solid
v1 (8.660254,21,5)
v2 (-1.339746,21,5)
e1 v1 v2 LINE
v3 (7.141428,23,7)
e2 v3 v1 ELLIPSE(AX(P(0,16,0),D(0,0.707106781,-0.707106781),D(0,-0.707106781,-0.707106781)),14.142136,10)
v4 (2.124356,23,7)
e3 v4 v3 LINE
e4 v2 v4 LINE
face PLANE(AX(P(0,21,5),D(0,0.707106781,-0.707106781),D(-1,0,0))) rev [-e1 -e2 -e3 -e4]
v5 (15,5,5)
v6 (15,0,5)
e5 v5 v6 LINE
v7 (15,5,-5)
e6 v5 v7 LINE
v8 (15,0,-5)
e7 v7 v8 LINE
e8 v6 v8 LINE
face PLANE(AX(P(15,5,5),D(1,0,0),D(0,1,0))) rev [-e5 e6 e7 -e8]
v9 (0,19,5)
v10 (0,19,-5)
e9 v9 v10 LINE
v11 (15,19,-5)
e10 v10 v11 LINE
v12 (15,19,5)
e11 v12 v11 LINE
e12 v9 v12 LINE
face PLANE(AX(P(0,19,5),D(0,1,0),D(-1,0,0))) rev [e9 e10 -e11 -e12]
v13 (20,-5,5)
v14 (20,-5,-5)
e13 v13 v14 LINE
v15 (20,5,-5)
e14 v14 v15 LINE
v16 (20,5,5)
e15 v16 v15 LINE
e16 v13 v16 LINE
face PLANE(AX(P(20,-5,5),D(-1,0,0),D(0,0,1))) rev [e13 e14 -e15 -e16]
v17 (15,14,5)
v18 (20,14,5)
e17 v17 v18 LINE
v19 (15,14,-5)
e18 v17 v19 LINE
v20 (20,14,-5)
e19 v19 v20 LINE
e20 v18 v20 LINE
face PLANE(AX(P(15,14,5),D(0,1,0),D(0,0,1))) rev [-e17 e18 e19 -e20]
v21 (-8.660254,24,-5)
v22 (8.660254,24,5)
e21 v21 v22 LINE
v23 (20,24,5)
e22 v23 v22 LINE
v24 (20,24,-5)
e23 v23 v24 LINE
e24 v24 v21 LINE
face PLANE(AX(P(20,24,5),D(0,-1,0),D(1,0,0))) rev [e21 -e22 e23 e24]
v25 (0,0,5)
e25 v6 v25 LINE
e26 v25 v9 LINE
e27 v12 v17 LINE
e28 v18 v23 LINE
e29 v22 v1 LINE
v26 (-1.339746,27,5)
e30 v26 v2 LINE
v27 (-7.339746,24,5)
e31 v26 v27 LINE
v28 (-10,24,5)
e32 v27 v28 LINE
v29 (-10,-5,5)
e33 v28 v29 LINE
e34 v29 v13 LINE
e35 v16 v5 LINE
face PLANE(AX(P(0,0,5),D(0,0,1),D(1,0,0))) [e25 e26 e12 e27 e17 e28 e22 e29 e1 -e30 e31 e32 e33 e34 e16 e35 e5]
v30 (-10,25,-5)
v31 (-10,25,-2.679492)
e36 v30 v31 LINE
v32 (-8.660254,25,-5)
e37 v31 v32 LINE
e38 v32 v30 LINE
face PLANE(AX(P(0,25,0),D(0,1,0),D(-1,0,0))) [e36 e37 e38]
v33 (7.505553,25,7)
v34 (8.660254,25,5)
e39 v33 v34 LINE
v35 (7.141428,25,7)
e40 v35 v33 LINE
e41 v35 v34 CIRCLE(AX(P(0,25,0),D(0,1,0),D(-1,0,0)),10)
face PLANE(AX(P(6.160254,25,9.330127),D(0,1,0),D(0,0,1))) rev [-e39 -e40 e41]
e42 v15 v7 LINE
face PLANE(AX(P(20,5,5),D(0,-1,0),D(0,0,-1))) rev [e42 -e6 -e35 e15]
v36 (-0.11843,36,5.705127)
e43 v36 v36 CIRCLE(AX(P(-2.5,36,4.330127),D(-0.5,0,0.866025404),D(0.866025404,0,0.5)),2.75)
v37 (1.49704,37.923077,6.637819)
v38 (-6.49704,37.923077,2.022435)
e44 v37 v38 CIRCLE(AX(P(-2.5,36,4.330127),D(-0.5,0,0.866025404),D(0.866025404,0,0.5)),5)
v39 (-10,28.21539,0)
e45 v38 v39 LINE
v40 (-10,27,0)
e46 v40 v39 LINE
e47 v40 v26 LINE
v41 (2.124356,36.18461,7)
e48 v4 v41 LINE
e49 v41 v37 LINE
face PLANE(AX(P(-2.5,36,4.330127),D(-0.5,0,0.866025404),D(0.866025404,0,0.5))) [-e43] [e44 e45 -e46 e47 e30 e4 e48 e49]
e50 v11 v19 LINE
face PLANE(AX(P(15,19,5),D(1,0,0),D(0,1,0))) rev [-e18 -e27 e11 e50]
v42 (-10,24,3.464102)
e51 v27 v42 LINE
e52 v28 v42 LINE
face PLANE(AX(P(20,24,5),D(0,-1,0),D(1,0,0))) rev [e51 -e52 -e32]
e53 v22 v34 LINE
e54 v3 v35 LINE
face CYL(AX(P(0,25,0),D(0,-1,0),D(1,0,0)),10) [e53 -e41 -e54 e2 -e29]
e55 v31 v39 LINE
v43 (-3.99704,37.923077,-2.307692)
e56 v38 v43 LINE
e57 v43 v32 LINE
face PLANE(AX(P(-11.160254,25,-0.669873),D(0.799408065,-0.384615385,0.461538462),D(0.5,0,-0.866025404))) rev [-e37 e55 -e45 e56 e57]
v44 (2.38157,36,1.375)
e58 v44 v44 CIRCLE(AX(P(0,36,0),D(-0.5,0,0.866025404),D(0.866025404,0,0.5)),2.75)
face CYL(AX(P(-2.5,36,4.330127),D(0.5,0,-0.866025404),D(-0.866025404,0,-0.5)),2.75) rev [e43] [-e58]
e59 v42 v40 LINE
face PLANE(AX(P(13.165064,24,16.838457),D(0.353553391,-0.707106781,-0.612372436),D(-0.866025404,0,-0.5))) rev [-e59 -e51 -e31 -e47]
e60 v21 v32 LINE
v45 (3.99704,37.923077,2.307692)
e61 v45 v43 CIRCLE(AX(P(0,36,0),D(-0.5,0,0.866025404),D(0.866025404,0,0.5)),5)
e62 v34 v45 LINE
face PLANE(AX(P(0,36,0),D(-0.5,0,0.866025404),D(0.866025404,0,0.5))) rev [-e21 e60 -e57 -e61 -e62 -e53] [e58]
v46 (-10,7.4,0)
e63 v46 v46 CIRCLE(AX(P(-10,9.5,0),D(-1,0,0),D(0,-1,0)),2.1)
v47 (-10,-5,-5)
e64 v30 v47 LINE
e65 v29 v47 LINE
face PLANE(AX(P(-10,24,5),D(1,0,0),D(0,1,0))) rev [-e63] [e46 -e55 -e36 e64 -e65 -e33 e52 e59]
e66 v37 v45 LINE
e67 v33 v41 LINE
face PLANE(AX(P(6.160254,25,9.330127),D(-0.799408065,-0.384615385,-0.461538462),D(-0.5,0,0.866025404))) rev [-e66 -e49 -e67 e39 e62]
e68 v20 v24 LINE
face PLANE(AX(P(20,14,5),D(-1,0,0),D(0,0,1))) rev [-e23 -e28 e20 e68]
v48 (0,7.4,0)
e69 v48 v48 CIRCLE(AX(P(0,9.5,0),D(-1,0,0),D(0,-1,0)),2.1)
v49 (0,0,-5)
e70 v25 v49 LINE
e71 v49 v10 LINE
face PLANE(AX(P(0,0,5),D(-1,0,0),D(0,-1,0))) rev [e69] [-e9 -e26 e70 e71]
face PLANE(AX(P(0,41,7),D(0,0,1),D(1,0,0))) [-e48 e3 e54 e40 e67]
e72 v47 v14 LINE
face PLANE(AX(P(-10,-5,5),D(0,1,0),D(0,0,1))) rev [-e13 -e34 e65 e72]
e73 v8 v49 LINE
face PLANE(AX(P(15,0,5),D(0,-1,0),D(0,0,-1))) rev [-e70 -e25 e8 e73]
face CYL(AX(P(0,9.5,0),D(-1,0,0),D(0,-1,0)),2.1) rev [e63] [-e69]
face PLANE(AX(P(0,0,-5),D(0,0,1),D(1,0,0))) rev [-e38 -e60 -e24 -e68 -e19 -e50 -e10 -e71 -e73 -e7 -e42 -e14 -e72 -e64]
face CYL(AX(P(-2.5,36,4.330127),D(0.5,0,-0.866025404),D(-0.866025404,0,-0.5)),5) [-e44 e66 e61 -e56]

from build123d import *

# Parameters (mm, degrees)
BOSS_EXTRUDE1_DEPTH = 5
SKETCH2_R           = 2.1
CUT_EXTRUDE1_DEPTH  = 10
SKETCH3_R           = 10
BOSS_EXTRUDE2_DEPTH = 1
SKETCH4_R           = 2.75
BOSS_EXTRUDE3_DEPTH = 5
SKETCH5_W           = 50
SKETCH5_H           = 30
SKETCH5_W_2         = 34
SKETCH5_H_2         = 14
CUT_EXTRUDE2_DEPTH  = 52.14684741
CUT_EXTRUDE3_START  = -1
CUT_EXTRUDE3_DEPTH  = 1
CUT_EXTRUDE4_START  = -1
CUT_EXTRUDE4_DEPTH  = 1
CHAMFER1_SIZE       = 3
CHAMFER2_SIZE       = 3
SKETCH8_W           = 10.980685111
SKETCH8_H           = 18.946061275
CUT_EXTRUDE5_DEPTH  = 51.645829048
BOSS_EXTRUDE4_DEPTH = 1


with BuildPart() as part:
    # Sketch1 → Boss-Extrude1 (new, symmetric)
    with BuildSketch(Plane.XY):
        Polygon((15, 5), (15, 0), (0, 0), (0, 19), (15, 19), (15, 14), (20, 14), (20, 24), (-10, 24), (-10, -5), (20, -5), (20, 5), align=None)
    extrude(amount=BOSS_EXTRUDE1_DEPTH, both=True)

    # Sketch2 → Cut-Extrude1 (cut)
    with BuildSketch(Plane.ZY.offset(10)):
        with Locations(Location((0, 9.5, 0), (0, 0, 270))):
            Circle(SKETCH2_R)
    extrude(amount=-CUT_EXTRUDE1_DEPTH, mode=Mode.SUBTRACT)

    # Sketch3 → Boss-Extrude2 (add)
    with BuildSketch(Plane(origin=(0, 24, 0), x_dir=(1, 0, 0), z_dir=(0, 1, 0))):
        with Locations(Location((0, 0, 0), (0, 0, 180))):
            Circle(SKETCH3_R)
    extrude(amount=BOSS_EXTRUDE2_DEPTH)

    # Sketch4 → Boss-Extrude3 (add)
    with BuildSketch(Plane(origin=(0, 0, 0), x_dir=(0.866025403784438, 0, 0.500000000000001), z_dir=(-0.500000000000001, 0, 0.866025403784438))):
        with BuildLine():
            Line((10, 25), (-10, 25))
            Line((-10, 25), (-4.615384615, 37.923076923))
            ThreePointArc((-4.615384615, 37.923076923), (0, 41), (4.615384615, 37.923076923))
            Line((4.615384615, 37.923076923), (10, 25))
        make_face()
        with Locations((0, 36)):
            Circle(SKETCH4_R, mode=Mode.SUBTRACT)
    extrude(amount=BOSS_EXTRUDE3_DEPTH)

    # Sketch5 → Cut-Extrude2 (cut, through all)
    with BuildSketch(Plane.XZ.offset(5)):
        with Locations((5, 0)):
            Rectangle(SKETCH5_W, SKETCH5_H)
        with Locations((5, 0)):
            Rectangle(SKETCH5_W_2, SKETCH5_H_2, mode=Mode.SUBTRACT)
    extrude(amount=-CUT_EXTRUDE2_DEPTH, mode=Mode.SUBTRACT)

    # Sketch6 → Cut-Extrude3 (cut)
    with BuildSketch(Plane(origin=(0, 25, 0), x_dir=(1, 0, 0), z_dir=(0, 1, 0)).offset(CUT_EXTRUDE3_START)):
        with BuildLine():
            Line((7.141428429, 7), (-7.141428429, 7))
            ThreePointArc((-7.141428429, 7), (-7.963874195, 6.047868038), (-8.660254038, 5))
            Line((-8.660254038, 5), (8.660254038, -5))
            ThreePointArc((8.660254038, -5), (9.920851384, 1.255670262), (7.141428429, 7))
        make_face()
    extrude(amount=CUT_EXTRUDE3_DEPTH, mode=Mode.SUBTRACT)

    # Sketch7 → Cut-Extrude4 (cut)
    with BuildSketch(Plane(origin=(0, 25, 0), x_dir=(1, 0, 0), z_dir=(0, 1, 0)).offset(CUT_EXTRUDE4_START)):
        with BuildLine():
            Line((-7.141428429, -7), (2.124355653, -7))
            Line((2.124355653, -7), (-10, 0))
            ThreePointArc((-10, 0), (-9.257815193, -3.780589618), (-7.141428429, -7))
        make_face()
    extrude(amount=CUT_EXTRUDE4_DEPTH, mode=Mode.SUBTRACT)

    # Chamfer1
    # the kernel refuses this chamfer: 3 mm, written as the material it adds along each edge
    with BuildSketch(Plane(origin=(5.341682432, 24, 8.857524482), x_dir=(0.013747938305293134, 0.9996219169112968, -0.023812127644090214), z_dir=(-0.8660254037844382, 0, -0.500000000000001))) as chamfer1_piece_1_section:
        Polygon((CHAMFER1_SIZE * 0.999621916911, -CHAMFER1_SIZE * 0.0274958766106), (-CHAMFER1_SIZE * 0.0274958766106, -CHAMFER1_SIZE * 0.999621916911), (0, 0), align=None)
    chamfer1_piece_1 = extrude(amount=25.430097928, mode=Mode.PRIVATE)
    chamfer1_piece_1 = split(chamfer1_piece_1, bisect_by=Plane(origin=(-10, 25.699033003, 2.85935222), z_dir=(1, 0, 0)), keep=Keep.TOP, mode=Mode.PRIVATE)
    chamfer1_piece_1 = split(chamfer1_piece_1, bisect_by=Plane(origin=(-6.251324666, 25.699033003, 5), z_dir=(0, 0, -1)), keep=Keep.TOP, mode=Mode.PRIVATE)
    add(chamfer1_piece_1)
    with BuildSketch(Plane(origin=(5.341682432, 24, 8.857524482), x_dir=(0.013747938305293134, 0.9996219169112968, -0.023812127644090214), z_dir=(-0.8660254037844382, 0, -0.500000000000001))) as chamfer1_piece_2_section:
        Polygon((CHAMFER1_SIZE * 0.999621916911, -CHAMFER1_SIZE * 0.0274958766106), (-CHAMFER1_SIZE * 0.0274958766106, -CHAMFER1_SIZE * 0.999621916911), (0, 0), align=None)
    chamfer1_piece_2 = extrude(amount=25.430097928, mode=Mode.PRIVATE)
    chamfer1_piece_2 = split(chamfer1_piece_2, bisect_by=Plane(origin=(-10.676225886, 25, 0.518721071), z_dir=(0, 1, 0)), keep=Keep.TOP, mode=Mode.PRIVATE)
    chamfer1_piece_2 = split(chamfer1_piece_2, bisect_by=Plane(origin=(-11.252418357, 25.835555068, 0.186056192), z_dir=(0.7994080650317889, -0.38461538461538497, 0.46153846153846245)), keep=Keep.TOP, mode=Mode.PRIVATE)
    chamfer1_piece_2 = split(chamfer1_piece_2, bisect_by=Plane(origin=(-10.676225886, 25.558334336, 5), z_dir=(0, 0, -1)), keep=Keep.TOP, mode=Mode.PRIVATE)
    add(chamfer1_piece_2)

    # Chamfer2
    # the kernel refuses this chamfer: 3 mm, written as the material it adds along each edge
    with BuildSketch(Plane(origin=(16.375303002, 24, 5), x_dir=(0, -0.9996219169112968, -0.02749587661058648), z_dir=(-1, 0, 0))) as chamfer2_piece_1_section:
        Polygon((CHAMFER2_SIZE * 0.999621916911, CHAMFER2_SIZE * 0.0274958766106), (-CHAMFER2_SIZE * 0.0274958766106, CHAMFER2_SIZE * 0.999621916911), (0, 0), align=None)
    chamfer2_piece_1 = extrude(amount=25.430097928, mode=Mode.PRIVATE)
    chamfer2_piece_1 = chamfer2_piece_1 & Plane(origin=(0, 22.869371877, 0), x_dir=(-1, 0, 0), z_dir=(0, -1, 0)) * Cylinder(10, 63, mode=Mode.PRIVATE)
    chamfer2_piece_1 = split(chamfer2_piece_1, bisect_by=Plane(origin=(4.051544609, 22.869371877, 7), z_dir=(0, 0, -1)), keep=Keep.TOP, mode=Mode.PRIVATE)
    chamfer2_piece_1 = split(chamfer2_piece_1, bisect_by=Plane(origin=(3.023607395, 22.869371877, 7.519183235), z_dir=(0.500000000000001, 0, -0.8660254037844382)), keep=Keep.TOP, mode=Mode.PRIVATE)
    add(chamfer2_piece_1)

    # Sketch8 → Cut-Extrude5 (cut, through all)
    with BuildSketch(Plane.XZ.offset(5)):
        with Locations((-15.490342555, -3.686972965)):
            Rectangle(SKETCH8_W, SKETCH8_H)
    extrude(amount=-CUT_EXTRUDE5_DEPTH, mode=Mode.SUBTRACT)

    # Sketch9 → Boss-Extrude4 (add)
    with BuildSketch(Plane(origin=(0, 24, 0), x_dir=(1, 0, 0), z_dir=(0, 1, 0))):
        with BuildLine():
            Line((-8.660254038, 5), (-10, 5))
            Line((-10, 5), (-10, 0))
            ThreePointArc((-10, 0), (-9.659258263, 2.588190451), (-8.660254038, 5))
        make_face()
    extrude(amount=BOSS_EXTRUDE4_DEPTH)


solid = part.part
